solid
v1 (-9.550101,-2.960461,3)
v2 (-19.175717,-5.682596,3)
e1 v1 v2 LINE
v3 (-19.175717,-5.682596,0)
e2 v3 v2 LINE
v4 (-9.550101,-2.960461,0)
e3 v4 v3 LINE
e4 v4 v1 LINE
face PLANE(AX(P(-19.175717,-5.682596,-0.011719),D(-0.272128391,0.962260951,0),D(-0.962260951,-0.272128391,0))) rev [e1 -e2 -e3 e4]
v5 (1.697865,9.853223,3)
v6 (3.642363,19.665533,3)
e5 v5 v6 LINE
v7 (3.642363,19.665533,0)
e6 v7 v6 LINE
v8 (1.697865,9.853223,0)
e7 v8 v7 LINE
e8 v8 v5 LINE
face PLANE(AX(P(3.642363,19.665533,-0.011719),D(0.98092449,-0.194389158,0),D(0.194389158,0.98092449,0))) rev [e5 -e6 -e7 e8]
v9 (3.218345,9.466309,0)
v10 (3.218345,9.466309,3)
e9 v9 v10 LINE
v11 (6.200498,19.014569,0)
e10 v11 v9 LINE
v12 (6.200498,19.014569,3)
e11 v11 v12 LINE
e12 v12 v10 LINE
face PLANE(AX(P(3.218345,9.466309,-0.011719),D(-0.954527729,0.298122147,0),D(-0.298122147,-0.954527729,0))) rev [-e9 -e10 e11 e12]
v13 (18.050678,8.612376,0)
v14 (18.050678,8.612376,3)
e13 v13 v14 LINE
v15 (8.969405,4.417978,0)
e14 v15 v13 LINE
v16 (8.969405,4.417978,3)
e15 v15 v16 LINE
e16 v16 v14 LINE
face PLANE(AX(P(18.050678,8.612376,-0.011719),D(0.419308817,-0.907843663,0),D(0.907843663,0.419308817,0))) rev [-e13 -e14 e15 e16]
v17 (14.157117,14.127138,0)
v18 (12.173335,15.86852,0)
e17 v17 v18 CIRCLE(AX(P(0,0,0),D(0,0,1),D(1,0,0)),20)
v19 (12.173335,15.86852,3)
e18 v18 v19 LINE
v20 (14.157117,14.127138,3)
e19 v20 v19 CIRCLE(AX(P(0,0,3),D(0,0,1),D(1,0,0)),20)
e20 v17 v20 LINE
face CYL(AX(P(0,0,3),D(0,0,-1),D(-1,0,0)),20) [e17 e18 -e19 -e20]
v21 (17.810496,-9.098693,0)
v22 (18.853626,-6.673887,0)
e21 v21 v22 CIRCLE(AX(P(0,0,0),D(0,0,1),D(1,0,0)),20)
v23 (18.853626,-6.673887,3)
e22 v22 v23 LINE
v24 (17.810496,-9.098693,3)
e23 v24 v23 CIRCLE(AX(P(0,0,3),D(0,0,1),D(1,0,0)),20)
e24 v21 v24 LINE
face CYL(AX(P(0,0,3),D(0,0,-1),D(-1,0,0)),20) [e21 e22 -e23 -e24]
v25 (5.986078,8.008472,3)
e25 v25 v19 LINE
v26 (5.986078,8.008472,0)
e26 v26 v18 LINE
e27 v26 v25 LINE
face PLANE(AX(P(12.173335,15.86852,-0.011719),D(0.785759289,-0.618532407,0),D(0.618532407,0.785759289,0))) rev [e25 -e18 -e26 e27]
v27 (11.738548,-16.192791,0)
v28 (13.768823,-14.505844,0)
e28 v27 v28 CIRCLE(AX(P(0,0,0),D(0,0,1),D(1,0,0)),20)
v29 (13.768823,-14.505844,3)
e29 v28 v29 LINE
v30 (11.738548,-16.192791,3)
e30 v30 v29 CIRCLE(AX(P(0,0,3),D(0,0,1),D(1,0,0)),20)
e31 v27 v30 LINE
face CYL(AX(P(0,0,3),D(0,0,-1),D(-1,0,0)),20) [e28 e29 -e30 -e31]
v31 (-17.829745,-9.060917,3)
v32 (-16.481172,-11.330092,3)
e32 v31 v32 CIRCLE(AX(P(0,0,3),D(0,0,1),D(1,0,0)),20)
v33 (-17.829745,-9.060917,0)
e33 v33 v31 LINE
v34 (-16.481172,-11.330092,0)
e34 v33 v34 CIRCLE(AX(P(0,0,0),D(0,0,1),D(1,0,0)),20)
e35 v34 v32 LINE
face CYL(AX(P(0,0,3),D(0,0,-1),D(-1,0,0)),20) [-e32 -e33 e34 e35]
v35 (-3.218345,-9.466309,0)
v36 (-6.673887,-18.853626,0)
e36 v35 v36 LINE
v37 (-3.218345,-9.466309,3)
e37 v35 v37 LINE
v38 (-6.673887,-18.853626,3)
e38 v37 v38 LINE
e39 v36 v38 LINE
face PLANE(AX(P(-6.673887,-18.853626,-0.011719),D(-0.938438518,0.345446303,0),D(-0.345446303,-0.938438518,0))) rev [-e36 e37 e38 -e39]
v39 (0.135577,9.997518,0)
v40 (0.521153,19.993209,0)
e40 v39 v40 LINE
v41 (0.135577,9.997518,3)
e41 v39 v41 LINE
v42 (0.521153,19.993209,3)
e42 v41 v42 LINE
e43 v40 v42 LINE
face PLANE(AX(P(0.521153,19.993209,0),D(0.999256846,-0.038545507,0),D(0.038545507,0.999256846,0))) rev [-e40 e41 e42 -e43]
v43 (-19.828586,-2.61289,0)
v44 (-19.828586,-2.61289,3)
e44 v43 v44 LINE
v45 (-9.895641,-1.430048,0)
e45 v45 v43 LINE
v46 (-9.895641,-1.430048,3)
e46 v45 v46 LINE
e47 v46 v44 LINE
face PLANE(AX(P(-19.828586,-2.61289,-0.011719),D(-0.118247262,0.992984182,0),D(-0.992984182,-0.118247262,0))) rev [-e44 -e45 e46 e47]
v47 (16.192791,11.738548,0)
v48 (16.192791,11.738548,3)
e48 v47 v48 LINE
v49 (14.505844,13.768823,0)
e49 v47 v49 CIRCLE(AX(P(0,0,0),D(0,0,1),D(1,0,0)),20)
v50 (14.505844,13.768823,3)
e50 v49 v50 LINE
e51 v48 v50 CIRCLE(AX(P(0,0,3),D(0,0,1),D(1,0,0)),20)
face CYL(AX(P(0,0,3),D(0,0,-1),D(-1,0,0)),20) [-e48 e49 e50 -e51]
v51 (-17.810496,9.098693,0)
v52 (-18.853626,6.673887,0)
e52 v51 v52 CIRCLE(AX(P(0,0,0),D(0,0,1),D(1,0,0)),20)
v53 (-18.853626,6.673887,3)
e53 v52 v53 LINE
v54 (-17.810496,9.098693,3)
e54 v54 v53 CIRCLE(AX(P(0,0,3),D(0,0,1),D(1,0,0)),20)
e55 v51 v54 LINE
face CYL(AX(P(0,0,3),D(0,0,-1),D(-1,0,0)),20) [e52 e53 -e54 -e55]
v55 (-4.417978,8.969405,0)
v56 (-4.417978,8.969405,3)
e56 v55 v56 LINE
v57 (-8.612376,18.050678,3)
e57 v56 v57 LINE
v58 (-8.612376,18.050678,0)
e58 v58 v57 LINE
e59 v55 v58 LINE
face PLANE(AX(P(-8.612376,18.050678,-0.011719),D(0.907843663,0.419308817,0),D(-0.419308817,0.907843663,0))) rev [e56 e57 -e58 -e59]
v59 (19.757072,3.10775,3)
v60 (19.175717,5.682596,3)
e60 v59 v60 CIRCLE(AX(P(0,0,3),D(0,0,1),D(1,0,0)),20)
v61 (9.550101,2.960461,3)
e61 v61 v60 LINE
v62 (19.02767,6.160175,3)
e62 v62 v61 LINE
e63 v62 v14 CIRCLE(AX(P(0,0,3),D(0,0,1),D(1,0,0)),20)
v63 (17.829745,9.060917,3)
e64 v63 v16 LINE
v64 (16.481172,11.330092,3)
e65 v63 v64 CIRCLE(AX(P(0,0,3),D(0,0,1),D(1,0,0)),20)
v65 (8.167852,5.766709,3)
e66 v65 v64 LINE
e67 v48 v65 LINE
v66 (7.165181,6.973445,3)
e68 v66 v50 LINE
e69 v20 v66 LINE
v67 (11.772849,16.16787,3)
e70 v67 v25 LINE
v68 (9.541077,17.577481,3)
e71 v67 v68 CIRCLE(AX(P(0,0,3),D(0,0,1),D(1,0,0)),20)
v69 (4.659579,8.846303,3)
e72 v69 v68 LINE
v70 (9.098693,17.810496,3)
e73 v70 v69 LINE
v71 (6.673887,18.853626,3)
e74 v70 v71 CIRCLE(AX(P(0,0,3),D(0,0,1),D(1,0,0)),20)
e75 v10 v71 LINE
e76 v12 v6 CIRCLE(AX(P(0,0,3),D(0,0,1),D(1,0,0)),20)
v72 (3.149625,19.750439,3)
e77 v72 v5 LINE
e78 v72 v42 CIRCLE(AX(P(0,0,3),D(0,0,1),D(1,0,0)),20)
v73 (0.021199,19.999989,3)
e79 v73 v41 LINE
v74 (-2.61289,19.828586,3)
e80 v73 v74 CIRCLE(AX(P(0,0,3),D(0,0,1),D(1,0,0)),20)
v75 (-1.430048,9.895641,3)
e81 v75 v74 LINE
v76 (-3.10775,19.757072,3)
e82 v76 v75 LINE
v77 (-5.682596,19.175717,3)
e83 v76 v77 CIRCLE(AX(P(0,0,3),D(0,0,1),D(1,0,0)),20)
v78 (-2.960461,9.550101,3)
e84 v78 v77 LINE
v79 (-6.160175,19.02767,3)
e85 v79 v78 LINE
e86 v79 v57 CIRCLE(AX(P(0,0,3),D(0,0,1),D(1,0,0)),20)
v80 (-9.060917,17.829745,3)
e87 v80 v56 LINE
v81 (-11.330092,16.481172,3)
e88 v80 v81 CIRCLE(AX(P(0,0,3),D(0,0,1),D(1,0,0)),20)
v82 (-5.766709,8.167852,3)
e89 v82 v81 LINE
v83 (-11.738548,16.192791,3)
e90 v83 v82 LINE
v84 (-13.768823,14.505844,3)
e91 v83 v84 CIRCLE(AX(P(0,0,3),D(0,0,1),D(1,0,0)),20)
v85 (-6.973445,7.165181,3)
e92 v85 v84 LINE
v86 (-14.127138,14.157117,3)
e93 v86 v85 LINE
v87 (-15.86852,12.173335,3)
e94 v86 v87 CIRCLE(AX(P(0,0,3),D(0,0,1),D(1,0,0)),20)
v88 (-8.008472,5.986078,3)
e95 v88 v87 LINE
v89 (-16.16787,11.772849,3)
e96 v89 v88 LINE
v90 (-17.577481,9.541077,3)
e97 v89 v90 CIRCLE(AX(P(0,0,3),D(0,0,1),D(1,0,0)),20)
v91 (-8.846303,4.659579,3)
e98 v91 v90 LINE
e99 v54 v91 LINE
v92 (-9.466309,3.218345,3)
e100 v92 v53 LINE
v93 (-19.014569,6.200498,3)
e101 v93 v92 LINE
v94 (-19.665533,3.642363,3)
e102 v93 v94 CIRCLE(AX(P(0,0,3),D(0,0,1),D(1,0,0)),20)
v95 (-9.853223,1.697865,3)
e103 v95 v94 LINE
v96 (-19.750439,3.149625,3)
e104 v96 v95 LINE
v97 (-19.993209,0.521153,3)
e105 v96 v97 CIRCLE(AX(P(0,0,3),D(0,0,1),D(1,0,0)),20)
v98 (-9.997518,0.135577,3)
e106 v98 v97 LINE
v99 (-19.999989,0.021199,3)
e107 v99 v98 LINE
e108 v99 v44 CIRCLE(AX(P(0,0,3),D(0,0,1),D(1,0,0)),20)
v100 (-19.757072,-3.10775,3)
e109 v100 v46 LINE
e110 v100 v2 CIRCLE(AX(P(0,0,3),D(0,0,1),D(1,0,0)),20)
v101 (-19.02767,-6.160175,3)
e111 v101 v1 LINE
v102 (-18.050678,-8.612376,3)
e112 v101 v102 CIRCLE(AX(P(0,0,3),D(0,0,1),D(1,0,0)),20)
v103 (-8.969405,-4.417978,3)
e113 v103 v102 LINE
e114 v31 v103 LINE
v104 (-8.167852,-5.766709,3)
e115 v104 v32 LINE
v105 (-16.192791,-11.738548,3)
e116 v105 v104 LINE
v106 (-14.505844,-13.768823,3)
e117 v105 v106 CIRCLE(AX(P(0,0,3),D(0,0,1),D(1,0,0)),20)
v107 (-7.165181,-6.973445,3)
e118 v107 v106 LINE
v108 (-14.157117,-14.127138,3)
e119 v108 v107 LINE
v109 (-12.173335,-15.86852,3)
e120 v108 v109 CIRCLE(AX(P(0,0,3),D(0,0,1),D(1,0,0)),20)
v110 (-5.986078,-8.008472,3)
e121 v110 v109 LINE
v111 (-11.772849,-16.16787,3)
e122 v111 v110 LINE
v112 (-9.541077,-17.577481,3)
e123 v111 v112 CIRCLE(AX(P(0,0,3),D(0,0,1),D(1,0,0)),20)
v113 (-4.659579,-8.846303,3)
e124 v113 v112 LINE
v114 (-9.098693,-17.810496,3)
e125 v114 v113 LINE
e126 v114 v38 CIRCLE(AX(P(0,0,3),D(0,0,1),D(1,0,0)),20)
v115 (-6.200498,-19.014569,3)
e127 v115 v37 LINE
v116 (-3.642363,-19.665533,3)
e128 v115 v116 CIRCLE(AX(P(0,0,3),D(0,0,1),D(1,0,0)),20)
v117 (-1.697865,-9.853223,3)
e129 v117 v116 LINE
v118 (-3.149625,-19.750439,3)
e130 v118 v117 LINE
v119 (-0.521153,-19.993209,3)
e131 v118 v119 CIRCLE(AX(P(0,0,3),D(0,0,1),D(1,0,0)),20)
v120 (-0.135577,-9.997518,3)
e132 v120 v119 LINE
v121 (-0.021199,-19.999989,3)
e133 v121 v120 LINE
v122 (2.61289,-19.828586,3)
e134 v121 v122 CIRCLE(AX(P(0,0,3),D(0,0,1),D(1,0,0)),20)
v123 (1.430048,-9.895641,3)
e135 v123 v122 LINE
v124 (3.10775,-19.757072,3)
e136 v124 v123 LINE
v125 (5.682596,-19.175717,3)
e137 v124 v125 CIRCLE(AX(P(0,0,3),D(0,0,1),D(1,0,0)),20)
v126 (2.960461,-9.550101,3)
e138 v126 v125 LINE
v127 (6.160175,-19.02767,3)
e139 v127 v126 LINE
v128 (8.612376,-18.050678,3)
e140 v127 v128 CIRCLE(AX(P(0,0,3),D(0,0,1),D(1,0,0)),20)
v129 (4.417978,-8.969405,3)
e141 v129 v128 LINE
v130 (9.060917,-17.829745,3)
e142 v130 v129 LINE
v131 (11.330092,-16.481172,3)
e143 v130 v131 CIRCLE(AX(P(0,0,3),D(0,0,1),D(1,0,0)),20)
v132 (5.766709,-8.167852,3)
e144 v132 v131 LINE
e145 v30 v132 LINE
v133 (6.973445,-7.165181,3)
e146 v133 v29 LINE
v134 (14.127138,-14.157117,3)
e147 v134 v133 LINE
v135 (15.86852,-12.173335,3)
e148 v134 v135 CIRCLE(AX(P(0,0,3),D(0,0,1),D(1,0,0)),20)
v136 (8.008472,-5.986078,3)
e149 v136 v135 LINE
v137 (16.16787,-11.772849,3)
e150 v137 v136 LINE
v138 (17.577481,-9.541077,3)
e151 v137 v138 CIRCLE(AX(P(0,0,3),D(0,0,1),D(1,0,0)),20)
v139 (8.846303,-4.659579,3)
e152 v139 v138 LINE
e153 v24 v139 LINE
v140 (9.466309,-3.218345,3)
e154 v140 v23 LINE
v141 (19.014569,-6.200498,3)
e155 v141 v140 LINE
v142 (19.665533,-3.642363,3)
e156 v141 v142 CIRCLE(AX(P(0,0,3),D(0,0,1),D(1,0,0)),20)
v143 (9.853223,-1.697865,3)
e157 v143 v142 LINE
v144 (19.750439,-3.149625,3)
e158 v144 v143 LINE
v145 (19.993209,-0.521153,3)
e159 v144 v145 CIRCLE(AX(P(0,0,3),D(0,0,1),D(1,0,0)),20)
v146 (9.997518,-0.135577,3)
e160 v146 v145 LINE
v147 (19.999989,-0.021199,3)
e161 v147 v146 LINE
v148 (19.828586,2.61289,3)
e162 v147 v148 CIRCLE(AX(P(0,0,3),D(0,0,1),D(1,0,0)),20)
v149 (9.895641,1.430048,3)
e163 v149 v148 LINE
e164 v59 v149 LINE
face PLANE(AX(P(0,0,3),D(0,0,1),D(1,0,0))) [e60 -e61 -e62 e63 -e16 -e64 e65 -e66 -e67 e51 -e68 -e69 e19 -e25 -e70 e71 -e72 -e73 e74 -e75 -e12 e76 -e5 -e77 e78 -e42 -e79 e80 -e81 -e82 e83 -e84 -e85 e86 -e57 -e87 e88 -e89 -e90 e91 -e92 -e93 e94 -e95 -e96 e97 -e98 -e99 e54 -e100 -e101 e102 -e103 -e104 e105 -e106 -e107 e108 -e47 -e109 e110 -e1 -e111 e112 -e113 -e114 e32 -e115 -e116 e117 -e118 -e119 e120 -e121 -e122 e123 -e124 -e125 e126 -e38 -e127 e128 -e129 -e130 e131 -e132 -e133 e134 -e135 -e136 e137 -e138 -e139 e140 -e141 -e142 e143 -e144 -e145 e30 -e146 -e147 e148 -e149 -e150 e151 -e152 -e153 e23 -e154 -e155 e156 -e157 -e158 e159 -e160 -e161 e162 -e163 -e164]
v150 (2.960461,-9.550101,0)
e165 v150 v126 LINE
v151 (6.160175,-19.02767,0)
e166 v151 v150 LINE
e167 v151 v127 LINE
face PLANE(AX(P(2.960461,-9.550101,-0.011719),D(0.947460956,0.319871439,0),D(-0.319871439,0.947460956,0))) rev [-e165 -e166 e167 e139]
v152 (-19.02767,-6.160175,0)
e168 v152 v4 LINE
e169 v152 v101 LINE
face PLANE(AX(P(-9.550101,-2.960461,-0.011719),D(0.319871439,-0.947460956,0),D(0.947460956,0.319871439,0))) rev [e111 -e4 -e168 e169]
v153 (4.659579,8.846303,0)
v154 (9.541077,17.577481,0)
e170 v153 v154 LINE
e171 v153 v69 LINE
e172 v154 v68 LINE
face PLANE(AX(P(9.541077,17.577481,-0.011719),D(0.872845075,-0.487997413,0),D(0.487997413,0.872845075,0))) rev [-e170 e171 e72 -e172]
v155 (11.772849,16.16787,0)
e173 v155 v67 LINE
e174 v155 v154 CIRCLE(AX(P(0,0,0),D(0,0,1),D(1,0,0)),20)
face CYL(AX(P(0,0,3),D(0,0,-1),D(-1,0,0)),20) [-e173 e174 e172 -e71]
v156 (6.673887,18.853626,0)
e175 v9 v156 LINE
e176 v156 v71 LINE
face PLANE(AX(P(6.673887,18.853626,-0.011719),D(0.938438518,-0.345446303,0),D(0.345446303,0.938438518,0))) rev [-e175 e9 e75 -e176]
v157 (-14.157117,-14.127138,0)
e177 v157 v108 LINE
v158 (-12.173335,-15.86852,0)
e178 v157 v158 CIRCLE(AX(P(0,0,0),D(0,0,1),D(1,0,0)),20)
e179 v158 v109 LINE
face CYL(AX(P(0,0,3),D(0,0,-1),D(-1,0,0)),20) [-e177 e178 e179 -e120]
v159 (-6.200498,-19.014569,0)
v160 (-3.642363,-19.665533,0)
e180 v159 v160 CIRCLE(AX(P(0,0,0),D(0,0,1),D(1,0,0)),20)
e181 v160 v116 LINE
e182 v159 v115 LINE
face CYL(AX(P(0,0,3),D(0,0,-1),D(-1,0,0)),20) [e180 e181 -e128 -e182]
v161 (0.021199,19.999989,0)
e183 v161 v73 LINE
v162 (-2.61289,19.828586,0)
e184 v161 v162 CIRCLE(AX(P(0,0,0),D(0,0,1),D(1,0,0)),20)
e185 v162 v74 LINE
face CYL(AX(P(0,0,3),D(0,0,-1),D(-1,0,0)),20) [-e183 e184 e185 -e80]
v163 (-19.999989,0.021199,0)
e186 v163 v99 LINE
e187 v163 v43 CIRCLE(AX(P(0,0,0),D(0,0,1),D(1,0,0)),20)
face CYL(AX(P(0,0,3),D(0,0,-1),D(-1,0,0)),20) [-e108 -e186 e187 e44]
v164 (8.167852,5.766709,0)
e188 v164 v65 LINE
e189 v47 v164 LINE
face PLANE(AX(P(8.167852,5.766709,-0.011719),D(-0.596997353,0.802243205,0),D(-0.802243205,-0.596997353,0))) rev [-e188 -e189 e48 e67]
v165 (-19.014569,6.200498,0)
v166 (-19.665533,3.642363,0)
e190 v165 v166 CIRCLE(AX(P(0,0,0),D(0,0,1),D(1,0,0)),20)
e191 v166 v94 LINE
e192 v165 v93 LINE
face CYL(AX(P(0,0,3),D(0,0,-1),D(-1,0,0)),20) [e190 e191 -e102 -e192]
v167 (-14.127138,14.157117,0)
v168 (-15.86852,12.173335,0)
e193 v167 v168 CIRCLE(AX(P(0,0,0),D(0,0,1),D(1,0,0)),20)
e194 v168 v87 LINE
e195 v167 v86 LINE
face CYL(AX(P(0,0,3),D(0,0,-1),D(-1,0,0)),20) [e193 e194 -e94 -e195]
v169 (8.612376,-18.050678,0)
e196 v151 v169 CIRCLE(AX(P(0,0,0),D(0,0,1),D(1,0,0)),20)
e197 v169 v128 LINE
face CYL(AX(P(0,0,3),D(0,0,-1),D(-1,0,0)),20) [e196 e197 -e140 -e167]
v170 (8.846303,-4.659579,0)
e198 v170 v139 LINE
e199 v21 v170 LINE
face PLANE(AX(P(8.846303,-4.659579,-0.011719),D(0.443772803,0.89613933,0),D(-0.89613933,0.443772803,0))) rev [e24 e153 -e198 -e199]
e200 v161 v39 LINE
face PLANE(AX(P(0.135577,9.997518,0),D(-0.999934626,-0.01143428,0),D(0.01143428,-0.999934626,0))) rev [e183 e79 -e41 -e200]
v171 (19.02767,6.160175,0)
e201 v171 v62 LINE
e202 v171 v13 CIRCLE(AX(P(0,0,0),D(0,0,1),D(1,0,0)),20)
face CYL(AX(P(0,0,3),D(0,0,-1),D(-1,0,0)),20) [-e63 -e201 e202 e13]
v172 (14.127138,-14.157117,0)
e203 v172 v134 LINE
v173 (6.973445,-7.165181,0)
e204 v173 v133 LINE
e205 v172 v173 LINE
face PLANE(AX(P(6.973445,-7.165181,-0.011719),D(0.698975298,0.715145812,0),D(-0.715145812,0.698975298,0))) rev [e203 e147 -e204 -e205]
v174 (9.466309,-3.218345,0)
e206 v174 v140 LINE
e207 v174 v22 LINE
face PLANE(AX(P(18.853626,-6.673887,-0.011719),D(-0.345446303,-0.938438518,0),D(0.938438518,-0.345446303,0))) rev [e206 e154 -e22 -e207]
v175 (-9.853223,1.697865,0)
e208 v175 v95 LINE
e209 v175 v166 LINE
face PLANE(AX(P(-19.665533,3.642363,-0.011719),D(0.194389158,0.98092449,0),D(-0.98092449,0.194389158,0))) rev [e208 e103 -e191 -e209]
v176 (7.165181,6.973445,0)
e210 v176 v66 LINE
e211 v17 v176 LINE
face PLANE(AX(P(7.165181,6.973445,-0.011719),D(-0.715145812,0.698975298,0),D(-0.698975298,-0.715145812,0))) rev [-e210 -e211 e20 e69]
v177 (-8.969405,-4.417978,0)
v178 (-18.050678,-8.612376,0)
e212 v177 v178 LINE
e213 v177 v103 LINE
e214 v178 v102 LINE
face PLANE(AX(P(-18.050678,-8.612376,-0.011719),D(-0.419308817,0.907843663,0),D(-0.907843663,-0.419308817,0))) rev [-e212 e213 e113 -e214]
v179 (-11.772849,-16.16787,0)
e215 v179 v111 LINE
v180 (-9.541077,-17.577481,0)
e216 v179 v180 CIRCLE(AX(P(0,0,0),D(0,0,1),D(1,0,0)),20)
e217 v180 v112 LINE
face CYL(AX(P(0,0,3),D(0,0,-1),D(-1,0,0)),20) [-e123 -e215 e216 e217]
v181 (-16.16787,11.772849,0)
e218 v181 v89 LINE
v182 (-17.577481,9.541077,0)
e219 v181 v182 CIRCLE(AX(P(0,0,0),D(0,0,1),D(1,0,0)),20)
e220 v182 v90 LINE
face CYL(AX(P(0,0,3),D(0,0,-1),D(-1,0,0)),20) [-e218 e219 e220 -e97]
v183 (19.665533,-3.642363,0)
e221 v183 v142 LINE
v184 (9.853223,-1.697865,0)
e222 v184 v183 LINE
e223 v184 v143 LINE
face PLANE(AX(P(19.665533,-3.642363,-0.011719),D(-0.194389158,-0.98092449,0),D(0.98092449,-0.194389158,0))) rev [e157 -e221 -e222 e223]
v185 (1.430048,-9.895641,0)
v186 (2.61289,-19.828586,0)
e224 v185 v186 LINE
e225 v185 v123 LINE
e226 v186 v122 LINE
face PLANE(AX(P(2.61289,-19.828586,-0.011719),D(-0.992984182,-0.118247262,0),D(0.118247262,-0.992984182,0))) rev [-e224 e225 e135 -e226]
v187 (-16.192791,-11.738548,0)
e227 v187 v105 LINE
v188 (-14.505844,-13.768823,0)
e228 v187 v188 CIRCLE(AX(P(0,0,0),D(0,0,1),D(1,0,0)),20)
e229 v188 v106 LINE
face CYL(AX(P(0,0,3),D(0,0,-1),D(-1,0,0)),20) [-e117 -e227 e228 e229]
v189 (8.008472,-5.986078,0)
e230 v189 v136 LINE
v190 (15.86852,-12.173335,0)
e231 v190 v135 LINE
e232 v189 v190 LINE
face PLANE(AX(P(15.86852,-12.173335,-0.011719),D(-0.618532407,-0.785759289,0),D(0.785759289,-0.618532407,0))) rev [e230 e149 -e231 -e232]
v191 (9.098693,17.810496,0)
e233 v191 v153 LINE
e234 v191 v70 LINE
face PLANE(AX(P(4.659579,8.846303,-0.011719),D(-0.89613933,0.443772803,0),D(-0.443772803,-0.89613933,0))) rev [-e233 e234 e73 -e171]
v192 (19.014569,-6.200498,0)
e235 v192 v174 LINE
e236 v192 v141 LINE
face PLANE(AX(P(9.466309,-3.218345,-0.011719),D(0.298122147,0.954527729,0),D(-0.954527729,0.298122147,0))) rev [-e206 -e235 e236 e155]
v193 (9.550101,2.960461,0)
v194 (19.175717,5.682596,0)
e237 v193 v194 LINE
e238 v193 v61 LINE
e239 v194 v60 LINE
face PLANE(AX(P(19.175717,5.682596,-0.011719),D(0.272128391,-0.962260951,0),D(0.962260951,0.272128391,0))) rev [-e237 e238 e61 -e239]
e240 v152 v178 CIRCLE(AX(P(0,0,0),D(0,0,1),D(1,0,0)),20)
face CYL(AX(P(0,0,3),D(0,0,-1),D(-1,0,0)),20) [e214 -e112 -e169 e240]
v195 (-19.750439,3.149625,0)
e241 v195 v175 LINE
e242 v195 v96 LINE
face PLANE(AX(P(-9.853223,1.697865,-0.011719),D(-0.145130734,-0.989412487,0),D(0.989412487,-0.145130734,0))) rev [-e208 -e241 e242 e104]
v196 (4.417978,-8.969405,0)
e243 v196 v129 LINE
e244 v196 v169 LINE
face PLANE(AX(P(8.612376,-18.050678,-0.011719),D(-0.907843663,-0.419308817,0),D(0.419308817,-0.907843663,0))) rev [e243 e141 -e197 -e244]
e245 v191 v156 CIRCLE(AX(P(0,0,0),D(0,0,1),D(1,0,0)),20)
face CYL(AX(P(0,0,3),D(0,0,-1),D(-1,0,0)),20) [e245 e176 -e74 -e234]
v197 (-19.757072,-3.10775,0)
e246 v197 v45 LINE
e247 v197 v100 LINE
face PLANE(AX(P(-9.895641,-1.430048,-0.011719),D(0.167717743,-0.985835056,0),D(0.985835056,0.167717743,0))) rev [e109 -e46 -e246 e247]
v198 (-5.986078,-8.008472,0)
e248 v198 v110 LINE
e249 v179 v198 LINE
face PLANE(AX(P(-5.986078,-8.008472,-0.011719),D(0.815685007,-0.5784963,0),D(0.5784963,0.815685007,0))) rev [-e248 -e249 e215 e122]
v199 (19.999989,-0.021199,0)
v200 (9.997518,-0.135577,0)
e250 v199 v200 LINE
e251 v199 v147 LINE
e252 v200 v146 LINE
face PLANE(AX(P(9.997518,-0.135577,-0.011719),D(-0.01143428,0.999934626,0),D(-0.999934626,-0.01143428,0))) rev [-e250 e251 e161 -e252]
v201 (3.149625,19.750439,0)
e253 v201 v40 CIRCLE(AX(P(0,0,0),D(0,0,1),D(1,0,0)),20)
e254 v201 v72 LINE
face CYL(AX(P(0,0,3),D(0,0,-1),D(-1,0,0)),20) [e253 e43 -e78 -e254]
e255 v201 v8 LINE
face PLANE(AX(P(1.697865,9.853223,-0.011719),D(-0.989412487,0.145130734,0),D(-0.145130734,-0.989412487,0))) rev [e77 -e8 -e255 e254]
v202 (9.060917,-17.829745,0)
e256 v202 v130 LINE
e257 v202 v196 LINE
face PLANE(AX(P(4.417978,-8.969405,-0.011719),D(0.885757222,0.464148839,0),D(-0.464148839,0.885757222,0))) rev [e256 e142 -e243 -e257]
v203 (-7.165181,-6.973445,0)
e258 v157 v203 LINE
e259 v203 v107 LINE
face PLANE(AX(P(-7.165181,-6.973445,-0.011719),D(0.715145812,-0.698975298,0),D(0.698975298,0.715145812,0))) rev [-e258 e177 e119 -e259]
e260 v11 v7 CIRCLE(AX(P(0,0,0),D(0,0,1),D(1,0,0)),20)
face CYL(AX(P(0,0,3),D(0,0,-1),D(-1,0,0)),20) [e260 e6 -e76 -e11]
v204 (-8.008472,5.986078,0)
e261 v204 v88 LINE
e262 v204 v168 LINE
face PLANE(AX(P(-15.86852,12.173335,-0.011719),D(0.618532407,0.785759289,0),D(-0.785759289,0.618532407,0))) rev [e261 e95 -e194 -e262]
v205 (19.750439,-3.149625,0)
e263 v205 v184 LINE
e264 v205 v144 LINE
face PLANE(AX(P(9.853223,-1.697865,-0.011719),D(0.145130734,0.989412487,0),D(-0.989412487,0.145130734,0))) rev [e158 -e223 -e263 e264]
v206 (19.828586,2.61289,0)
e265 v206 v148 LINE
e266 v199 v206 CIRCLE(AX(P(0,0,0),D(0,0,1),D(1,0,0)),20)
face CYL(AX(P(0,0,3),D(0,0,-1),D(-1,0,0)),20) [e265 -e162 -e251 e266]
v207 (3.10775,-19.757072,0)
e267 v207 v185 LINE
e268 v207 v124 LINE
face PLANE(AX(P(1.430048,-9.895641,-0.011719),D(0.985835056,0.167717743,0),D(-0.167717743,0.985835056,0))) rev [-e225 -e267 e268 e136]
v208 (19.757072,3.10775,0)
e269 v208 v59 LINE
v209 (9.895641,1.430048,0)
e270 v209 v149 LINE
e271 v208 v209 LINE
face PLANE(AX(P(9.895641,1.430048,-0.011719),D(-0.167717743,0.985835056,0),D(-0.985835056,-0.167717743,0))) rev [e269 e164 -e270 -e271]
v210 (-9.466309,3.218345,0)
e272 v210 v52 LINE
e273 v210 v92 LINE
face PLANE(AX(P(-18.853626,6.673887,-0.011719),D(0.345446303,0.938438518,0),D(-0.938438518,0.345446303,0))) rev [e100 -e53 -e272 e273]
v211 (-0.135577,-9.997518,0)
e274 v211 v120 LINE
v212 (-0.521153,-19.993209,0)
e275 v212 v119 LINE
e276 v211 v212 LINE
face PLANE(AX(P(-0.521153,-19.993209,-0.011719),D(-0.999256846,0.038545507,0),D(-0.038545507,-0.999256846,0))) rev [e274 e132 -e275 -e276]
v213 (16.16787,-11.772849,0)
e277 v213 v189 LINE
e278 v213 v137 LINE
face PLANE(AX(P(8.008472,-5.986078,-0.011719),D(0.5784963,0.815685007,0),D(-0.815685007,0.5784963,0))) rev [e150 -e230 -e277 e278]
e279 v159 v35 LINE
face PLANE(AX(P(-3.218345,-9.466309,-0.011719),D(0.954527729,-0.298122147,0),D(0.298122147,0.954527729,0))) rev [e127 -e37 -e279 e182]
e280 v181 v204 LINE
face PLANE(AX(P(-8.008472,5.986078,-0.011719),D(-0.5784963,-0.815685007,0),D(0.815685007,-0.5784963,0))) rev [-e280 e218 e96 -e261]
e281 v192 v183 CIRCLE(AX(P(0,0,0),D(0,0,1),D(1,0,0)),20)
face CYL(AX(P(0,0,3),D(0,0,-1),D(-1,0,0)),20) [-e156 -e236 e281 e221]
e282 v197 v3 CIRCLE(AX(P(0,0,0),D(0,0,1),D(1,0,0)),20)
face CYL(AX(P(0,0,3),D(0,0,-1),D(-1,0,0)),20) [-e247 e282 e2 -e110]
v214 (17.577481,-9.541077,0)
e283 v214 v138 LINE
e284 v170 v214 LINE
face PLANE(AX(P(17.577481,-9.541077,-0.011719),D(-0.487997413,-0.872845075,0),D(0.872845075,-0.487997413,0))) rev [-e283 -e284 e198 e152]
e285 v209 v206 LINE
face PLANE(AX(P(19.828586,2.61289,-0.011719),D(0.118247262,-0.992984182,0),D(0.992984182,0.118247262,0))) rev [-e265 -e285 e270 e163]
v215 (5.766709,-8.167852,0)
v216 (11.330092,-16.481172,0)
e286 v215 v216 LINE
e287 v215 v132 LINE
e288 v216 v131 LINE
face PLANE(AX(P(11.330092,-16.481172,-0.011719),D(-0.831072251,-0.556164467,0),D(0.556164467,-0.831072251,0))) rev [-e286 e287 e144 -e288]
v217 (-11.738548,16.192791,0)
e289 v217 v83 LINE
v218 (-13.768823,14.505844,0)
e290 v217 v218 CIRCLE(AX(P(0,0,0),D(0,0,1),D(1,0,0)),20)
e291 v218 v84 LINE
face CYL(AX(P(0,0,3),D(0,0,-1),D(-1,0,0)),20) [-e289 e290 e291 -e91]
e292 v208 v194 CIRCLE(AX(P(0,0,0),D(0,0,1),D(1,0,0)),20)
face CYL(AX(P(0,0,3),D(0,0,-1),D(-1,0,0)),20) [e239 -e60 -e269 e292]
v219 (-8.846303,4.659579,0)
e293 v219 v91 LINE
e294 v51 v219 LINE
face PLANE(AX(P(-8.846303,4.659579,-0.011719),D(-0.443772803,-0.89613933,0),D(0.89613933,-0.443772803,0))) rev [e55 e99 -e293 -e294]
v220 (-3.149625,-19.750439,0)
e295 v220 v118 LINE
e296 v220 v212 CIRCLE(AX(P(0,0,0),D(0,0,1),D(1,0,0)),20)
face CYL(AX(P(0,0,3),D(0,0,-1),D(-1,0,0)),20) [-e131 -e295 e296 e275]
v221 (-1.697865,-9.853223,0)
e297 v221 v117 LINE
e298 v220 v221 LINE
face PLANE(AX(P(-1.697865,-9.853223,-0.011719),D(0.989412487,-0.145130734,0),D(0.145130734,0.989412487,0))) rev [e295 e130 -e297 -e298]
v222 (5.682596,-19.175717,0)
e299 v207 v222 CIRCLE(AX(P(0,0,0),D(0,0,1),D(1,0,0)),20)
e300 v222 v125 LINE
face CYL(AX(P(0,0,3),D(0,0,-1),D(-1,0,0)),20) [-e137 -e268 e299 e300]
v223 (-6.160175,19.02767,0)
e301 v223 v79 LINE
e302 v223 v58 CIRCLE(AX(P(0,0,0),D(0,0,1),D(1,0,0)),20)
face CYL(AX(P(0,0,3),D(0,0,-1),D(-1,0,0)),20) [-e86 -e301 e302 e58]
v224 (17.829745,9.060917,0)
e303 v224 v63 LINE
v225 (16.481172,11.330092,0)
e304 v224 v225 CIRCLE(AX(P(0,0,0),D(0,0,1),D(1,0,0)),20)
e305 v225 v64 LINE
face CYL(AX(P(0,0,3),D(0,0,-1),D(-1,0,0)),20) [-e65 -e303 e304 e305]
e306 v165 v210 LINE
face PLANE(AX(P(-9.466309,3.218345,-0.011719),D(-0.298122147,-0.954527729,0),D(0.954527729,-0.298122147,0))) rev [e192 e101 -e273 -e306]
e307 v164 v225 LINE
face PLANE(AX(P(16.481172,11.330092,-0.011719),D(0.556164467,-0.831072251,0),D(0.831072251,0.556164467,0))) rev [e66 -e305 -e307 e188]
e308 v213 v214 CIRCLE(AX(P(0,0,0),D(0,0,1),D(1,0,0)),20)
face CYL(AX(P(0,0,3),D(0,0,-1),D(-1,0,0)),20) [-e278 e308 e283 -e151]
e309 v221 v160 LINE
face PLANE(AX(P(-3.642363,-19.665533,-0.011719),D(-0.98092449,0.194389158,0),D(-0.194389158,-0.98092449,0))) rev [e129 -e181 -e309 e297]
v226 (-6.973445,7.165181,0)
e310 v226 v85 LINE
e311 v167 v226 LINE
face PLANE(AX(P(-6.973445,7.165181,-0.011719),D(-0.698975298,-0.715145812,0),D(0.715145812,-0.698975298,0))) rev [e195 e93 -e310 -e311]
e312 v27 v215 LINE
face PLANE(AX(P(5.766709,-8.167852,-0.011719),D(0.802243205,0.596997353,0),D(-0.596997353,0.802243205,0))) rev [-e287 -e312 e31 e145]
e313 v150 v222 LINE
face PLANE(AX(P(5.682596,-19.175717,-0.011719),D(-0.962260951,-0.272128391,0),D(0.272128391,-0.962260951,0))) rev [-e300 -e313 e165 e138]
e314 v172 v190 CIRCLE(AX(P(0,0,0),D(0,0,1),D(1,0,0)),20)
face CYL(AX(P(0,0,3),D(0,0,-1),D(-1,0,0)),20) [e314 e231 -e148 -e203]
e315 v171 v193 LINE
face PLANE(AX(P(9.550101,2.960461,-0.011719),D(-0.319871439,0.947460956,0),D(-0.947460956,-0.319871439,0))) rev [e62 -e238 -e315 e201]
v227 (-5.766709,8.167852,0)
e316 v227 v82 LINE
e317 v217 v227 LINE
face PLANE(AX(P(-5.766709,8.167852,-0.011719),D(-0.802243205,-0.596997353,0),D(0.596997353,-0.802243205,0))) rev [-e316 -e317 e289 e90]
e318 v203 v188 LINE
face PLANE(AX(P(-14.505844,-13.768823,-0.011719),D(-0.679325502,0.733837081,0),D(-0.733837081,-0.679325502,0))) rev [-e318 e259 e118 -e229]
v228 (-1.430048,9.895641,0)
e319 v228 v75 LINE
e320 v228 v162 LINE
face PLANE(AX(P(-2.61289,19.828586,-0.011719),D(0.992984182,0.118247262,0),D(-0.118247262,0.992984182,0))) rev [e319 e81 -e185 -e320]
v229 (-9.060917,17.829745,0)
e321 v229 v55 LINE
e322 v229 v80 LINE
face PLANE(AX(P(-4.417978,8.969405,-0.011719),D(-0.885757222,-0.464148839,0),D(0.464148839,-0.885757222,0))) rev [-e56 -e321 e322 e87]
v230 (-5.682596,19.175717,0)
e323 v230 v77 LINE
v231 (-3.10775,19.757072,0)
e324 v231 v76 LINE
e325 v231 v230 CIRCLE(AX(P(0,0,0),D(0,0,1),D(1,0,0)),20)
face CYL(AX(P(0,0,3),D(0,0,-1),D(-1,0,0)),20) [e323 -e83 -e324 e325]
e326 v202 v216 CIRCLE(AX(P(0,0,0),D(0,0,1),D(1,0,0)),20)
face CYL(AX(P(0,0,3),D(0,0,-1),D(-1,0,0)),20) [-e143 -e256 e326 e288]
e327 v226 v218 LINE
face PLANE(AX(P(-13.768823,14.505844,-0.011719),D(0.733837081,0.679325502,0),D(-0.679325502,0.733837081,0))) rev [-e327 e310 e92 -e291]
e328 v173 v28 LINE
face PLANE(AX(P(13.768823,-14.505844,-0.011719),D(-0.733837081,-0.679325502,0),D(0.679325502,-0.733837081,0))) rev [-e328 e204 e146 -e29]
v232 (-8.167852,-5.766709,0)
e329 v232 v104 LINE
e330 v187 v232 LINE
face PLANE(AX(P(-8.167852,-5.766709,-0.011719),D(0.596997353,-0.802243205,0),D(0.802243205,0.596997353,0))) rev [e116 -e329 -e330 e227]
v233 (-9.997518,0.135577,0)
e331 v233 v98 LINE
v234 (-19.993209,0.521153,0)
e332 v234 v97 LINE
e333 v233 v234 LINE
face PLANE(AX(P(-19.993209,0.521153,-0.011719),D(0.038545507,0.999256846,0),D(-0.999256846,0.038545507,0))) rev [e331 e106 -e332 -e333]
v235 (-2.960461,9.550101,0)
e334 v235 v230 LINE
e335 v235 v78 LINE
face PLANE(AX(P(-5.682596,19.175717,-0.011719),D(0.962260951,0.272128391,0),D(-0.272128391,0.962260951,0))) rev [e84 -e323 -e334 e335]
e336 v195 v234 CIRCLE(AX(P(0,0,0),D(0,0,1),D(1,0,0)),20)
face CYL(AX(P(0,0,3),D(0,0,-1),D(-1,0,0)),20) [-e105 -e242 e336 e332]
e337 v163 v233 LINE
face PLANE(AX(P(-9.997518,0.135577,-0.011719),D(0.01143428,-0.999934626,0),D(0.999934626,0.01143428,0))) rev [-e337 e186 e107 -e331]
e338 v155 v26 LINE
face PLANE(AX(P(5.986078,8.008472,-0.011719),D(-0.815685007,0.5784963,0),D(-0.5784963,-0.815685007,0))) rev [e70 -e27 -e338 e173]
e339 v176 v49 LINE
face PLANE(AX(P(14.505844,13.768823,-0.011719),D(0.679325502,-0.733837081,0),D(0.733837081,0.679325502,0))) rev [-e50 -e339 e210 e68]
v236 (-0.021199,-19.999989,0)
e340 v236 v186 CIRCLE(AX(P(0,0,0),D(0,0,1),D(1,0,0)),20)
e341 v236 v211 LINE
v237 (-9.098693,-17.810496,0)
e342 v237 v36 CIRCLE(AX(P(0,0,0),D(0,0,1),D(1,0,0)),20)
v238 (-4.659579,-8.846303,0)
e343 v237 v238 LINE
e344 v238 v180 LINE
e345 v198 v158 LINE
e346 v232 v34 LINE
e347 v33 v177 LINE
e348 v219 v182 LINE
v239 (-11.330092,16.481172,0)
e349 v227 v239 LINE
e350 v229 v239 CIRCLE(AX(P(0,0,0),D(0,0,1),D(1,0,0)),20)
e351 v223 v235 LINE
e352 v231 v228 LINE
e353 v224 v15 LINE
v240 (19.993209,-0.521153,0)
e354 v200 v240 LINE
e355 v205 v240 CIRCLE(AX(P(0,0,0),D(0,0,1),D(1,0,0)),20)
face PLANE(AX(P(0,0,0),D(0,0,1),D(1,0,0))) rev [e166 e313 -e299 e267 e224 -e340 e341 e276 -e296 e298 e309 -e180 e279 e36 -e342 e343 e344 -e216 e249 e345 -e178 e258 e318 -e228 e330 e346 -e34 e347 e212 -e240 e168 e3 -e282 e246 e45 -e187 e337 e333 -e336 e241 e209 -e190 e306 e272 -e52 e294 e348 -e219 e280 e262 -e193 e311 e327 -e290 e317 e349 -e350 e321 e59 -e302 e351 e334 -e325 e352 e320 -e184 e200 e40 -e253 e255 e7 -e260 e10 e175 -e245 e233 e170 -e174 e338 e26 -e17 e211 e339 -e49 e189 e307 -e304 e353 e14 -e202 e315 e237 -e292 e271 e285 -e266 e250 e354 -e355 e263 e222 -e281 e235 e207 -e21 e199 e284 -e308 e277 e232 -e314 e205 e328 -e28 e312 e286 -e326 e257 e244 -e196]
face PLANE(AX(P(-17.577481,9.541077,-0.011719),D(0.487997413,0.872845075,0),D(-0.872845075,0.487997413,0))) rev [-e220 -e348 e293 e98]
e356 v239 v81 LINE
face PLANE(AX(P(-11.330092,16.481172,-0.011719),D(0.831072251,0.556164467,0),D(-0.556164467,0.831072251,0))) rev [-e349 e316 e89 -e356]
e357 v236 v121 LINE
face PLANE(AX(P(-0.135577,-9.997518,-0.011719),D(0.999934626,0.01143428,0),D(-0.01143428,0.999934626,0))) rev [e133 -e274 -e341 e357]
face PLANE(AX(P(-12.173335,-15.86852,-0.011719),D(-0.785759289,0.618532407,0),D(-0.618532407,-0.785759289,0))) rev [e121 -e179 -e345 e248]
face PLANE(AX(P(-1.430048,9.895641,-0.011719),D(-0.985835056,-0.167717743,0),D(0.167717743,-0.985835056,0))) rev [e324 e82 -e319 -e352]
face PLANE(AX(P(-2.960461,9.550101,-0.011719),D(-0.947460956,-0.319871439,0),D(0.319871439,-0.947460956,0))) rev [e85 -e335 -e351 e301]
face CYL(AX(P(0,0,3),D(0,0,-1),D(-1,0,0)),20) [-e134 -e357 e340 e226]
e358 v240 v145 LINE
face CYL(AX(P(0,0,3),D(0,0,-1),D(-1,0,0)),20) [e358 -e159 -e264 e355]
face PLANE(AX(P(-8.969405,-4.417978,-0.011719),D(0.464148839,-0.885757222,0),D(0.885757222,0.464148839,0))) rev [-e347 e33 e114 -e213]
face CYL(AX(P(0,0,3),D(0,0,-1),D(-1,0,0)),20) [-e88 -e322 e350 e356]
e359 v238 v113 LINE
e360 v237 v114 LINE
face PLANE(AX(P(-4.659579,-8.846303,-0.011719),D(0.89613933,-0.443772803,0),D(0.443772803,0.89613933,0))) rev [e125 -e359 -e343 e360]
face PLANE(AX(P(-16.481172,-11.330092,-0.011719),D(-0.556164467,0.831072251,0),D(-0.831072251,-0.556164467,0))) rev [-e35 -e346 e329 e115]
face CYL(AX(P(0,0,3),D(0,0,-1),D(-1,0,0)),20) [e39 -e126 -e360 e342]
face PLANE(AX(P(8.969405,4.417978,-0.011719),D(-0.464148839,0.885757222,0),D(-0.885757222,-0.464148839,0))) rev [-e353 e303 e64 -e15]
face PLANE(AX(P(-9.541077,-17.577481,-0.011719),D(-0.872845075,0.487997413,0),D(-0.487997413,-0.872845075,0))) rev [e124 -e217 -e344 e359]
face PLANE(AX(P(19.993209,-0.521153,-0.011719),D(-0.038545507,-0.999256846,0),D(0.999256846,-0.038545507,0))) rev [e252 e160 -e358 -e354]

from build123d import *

# Parameters (mm, degrees)
SKETCH1_R           = 20
BOSS_EXTRUDE1_DEPTH = 3
CUT_EXTRUDE5_DEPTH  = 29.442925307
CIRPATTERN1_DEPTH   = 3


# Read off the part's stored shape, not the designer's step: CirPattern1
with BuildPart() as part:
    # Sketch1 → Boss-Extrude1 (new body)
    with BuildSketch(Plane.XY):
        Circle(SKETCH1_R)
    extrude(amount=BOSS_EXTRUDE1_DEPTH)

    # Sketch2 → Cut-Extrude5 (cut, through all)
    with BuildSketch(Plane.XY.offset(3)):
        Polygon((0.021198778, 19.999988765), (0.521152809, 19.993208841), (0.135577303, 9.997518193), align=None)
    extrude(amount=-CUT_EXTRUDE5_DEPTH, mode=Mode.SUBTRACT)


with BuildPart() as cut_extrude5_kept_piece:
    # of the separate pieces the step leaves, the one the design keeps (cut_extrude5_pieces_kept)
    add(part.part.solids().sort_by_distance((20, 0, 0))[0])

    # CirPattern1 outline → CirPattern1 (cut)
    with BuildSketch(Plane.XY):
        with BuildLine():
            Line((-3.107749756, 19.757071931), (-1.430048289, 9.895641117))
            Line((-1.430048289, 9.895641117), (-2.612890376, 19.828585521))
            ThreePointArc((-2.612890376, 19.828585521), (-2.860543555, 19.794375222), (-3.107749756, 19.757071931))
        make_face()
        with BuildLine():
            Line((1.697864531, 9.853223191), (3.642363483, 19.665533006))
            ThreePointArc((3.642363483, 19.665533006), (3.396259749, 19.709526119), (3.149625329, 19.750439499))
            Line((3.149625329, 19.750439499), (1.697864531, 9.853223191))
        make_face()
        with BuildLine():
            Line((3.2183447, 9.466309133), (6.673887081, 18.853626482))
            ThreePointArc((6.673887081, 18.853626482), (6.437695332, 18.935577073), (6.200497654, 19.014568864))
            Line((6.200497654, 19.014568864), (3.2183447, 9.466309133))
        make_face()
        with BuildLine():
            Line((4.659578542, 8.846303128), (9.541077431, 17.577481101))
            ThreePointArc((9.541077431, 17.577481101), (9.320613491, 17.695371275), (9.098693148, 17.810496438))
            Line((9.098693148, 17.810496438), (4.659578542, 8.846303128))
        make_face()
        with BuildLine():
            Line((5.986078095, 8.00847178), (12.17333479, 15.868519799))
            ThreePointArc((12.17333479, 15.868519799), (11.974027213, 16.019446707), (11.772848622, 16.167870479))
            Line((11.772848622, 16.167870479), (5.986078095, 8.00847178))
        make_face()
        with BuildLine():
            Line((7.165180539, 6.973445279), (14.505844245, 13.768822875))
            ThreePointArc((14.505844245, 13.768822875), (14.332600646, 13.949070196), (14.15711749, 14.127137891))
            Line((14.15711749, 14.127137891), (7.165180539, 6.973445279))
        make_face()
        with BuildLine():
            Line((8.167852459, 5.766709411), (16.481171674, 11.330091834))
            ThreePointArc((16.481171674, 11.330091834), (16.338257884, 11.535221282), (16.192791142, 11.73854828))
            Line((16.192791142, 11.73854828), (8.167852459, 5.766709411))
        make_face()
        with BuildLine():
            Line((8.969404743, 4.417978019), (18.050677958, 8.612376328))
            ThreePointArc((18.050677958, 8.612376328), (17.94161299, 8.837336935), (17.829744535, 9.060916653))
            Line((17.829744535, 9.060916653), (8.969404743, 4.417978019))
        make_face()
        with BuildLine():
            Line((9.550100515, 2.960461346), (19.175716644, 5.682595535))
            ThreePointArc((19.175716644, 5.682595535), (19.103186038, 5.921848023), (19.027670443, 6.160175186))
            Line((19.027670443, 6.160175186), (9.550100515, 2.960461346))
        make_face()
        with BuildLine():
            Line((9.895641117, 1.430048289), (19.828585545, 2.612890379))
            ThreePointArc((19.828585545, 2.612890379), (19.794375247, 2.860543558), (19.757071956, 3.10774976))
            Line((19.757071956, 3.10774976), (9.895641117, 1.430048289))
        make_face()
        with BuildLine():
            Line((9.997518193, -0.135577303), (19.993208862, -0.52115281))
            ThreePointArc((19.993208862, -0.52115281), (19.998161242, -0.271196982), (19.999988787, -0.021198778))
            Line((19.999988787, -0.021198778), (9.997518193, -0.135577303))
        make_face()
        with BuildLine():
            Line((9.853223191, -1.697864531), (19.665533023, -3.642363486))
            ThreePointArc((19.665533023, -3.642363486), (19.709526137, -3.396259752), (19.750439517, -3.149625332))
            Line((19.750439517, -3.149625332), (9.853223191, -1.697864531))
        make_face()
        with BuildLine():
            Line((9.466309133, -3.2183447), (18.853626494, -6.673887086))
            ThreePointArc((18.853626494, -6.673887086), (18.935577086, -6.437695337), (19.014568878, -6.200497658))
            Line((19.014568878, -6.200497658), (9.466309133, -3.2183447))
        make_face()
        with BuildLine():
            Line((8.846303128, -4.659578542), (17.577481109, -9.541077435))
            ThreePointArc((17.577481109, -9.541077435), (17.695371283, -9.320613495), (17.810496447, -9.098693153))
            Line((17.810496447, -9.098693153), (8.846303128, -4.659578542))
        make_face()
        with BuildLine():
            Line((8.00847178, -5.986078095), (15.868519802, -12.173334792))
            ThreePointArc((15.868519802, -12.173334792), (16.019446711, -11.974027216), (16.167870483, -11.772848624))
            Line((16.167870483, -11.772848624), (8.00847178, -5.986078095))
        make_face()
        with BuildLine():
            Line((6.973445279, -7.165180539), (13.768822874, -14.505844245))
            ThreePointArc((13.768822874, -14.505844245), (13.949070196, -14.332600646), (14.127137891, -14.15711749))
            Line((14.127137891, -14.15711749), (6.973445279, -7.165180539))
        make_face()
        with BuildLine():
            Line((5.766709411, -8.167852459), (11.330091831, -16.481171669))
            ThreePointArc((11.330091831, -16.481171669), (11.535221279, -16.33825788), (11.738548277, -16.192791138))
            Line((11.738548277, -16.192791138), (5.766709411, -8.167852459))
        make_face()
        with BuildLine():
            Line((4.417978019, -8.969404743), (8.612376324, -18.050677949))
            ThreePointArc((8.612376324, -18.050677949), (8.83733693, -17.941612981), (9.060916649, -17.829744526))
            Line((9.060916649, -17.829744526), (4.417978019, -8.969404743))
        make_face()
        with BuildLine():
            Line((2.960461346, -9.550100515), (5.682595531, -19.17571663))
            ThreePointArc((5.682595531, -19.17571663), (5.921848019, -19.103186025), (6.160175182, -19.02767043))
            Line((6.160175182, -19.02767043), (2.960461346, -9.550100515))
        make_face()
        with BuildLine():
            Line((1.430048289, -9.895641117), (2.612890376, -19.828585527))
            ThreePointArc((2.612890376, -19.828585527), (2.860543556, -19.794375229), (3.107749758, -19.757071938))
            Line((3.107749758, -19.757071938), (1.430048289, -9.895641117))
        make_face()
        with BuildLine():
            Line((-0.135577303, -9.997518193), (-0.521152809, -19.99320884))
            ThreePointArc((-0.521152809, -19.99320884), (-0.271196982, -19.99816122), (-0.021198778, -19.999988765))
            Line((-0.021198778, -19.999988765), (-0.135577303, -9.997518193))
        make_face()
        with BuildLine():
            Line((-1.697864531, -9.853223191), (-3.642363481, -19.665532998))
            ThreePointArc((-3.642363481, -19.665532998), (-3.396259748, -19.709526112), (-3.149625328, -19.750439493))
            Line((-3.149625328, -19.750439493), (-1.697864531, -9.853223191))
        make_face()
        with BuildLine():
            Line((-3.2183447, -9.466309133), (-6.673887077, -18.853626468))
            ThreePointArc((-6.673887077, -18.853626468), (-6.437695328, -18.93557706), (-6.20049765, -19.014568852))
            Line((-6.20049765, -19.014568852), (-3.2183447, -9.466309133))
        make_face()
        with BuildLine():
            Line((-4.659578542, -8.846303128), (-9.541077421, -17.577481083))
            ThreePointArc((-9.541077421, -17.577481083), (-9.320613482, -17.695371257), (-9.098693139, -17.810496421))
            Line((-9.098693139, -17.810496421), (-4.659578542, -8.846303128))
        make_face()
        with BuildLine():
            Line((-5.986078095, -8.00847178), (-12.173334774, -15.868519778))
            ThreePointArc((-12.173334774, -15.868519778), (-11.974027198, -16.019446687), (-11.772848606, -16.167870459))
            Line((-11.772848606, -16.167870459), (-5.986078095, -8.00847178))
        make_face()
        with BuildLine():
            Line((-7.165180539, -6.973445279), (-14.505844222, -13.768822853))
            ThreePointArc((-14.505844222, -13.768822853), (-14.332600623, -13.949070175), (-14.157117468, -14.127137869))
            Line((-14.157117468, -14.127137869), (-7.165180539, -6.973445279))
        make_face()
        with BuildLine():
            Line((-8.167852459, -5.766709411), (-16.481171644, -11.330091814))
            ThreePointArc((-16.481171644, -11.330091814), (-16.338257855, -11.535221261), (-16.192791114, -11.738548259))
            Line((-16.192791114, -11.738548259), (-8.167852459, -5.766709411))
        make_face()
        with BuildLine():
            Line((-8.969404743, -4.417978019), (-18.050677923, -8.612376311))
            ThreePointArc((-18.050677923, -8.612376311), (-17.941612955, -8.837336918), (-17.8297445, -9.060916636))
            Line((-17.8297445, -9.060916636), (-8.969404743, -4.417978019))
        make_face()
        with BuildLine():
            Line((-9.550100515, -2.960461346), (-19.175716604, -5.682595523))
            ThreePointArc((-19.175716604, -5.682595523), (-19.103185999, -5.921848011), (-19.027670404, -6.160175173))
            Line((-19.027670404, -6.160175173), (-9.550100515, -2.960461346))
        make_face()
        with BuildLine():
            Line((-9.895641117, -1.430048289), (-19.828585502, -2.612890373))
            ThreePointArc((-19.828585502, -2.612890373), (-19.794375204, -2.860543552), (-19.757071914, -3.107749754))
            Line((-19.757071914, -3.107749754), (-9.895641117, -1.430048289))
        make_face()
        with BuildLine():
            Line((-9.997518193, 0.135577303), (-19.993208819, 0.521152808))
            ThreePointArc((-19.993208819, 0.521152808), (-19.998161198, 0.271196981), (-19.999988743, 0.021198778))
            Line((-19.999988743, 0.021198778), (-9.997518193, 0.135577303))
        make_face()
        with BuildLine():
            Line((-9.853223191, 1.697864531), (-19.665532981, 3.642363478))
            ThreePointArc((-19.665532981, 3.642363478), (-19.709526095, 3.396259745), (-19.750439475, 3.149625326))
            Line((-19.750439475, 3.149625326), (-9.853223191, 1.697864531))
        make_face()
        with BuildLine():
            Line((-9.466309133, 3.2183447), (-18.853626455, 6.673887072))
            ThreePointArc((-18.853626455, 6.673887072), (-18.935577047, 6.437695323), (-19.014568838, 6.200497646))
            Line((-19.014568838, 6.200497646), (-9.466309133, 3.2183447))
        make_face()
        with BuildLine():
            Line((-8.846303128, 4.659578542), (-17.577481075, 9.541077417))
            ThreePointArc((-17.577481075, 9.541077417), (-17.695371249, 9.320613477), (-17.810496412, 9.098693135))
            Line((-17.810496412, 9.098693135), (-8.846303128, 4.659578542))
        make_face()
        with BuildLine():
            Line((-8.00847178, 5.986078095), (-15.868519775, 12.173334771))
            ThreePointArc((-15.868519775, 12.173334771), (-16.019446683, 11.974027195), (-16.167870455, 11.772848604))
            Line((-16.167870455, 11.772848604), (-8.00847178, 5.986078095))
        make_face()
        with BuildLine():
            Line((-6.973445279, 7.165180539), (-13.768822853, 14.505844223))
            ThreePointArc((-13.768822853, 14.505844223), (-13.949070175, 14.332600624), (-14.127137869, 14.157117468))
            Line((-14.127137869, 14.157117468), (-6.973445279, 7.165180539))
        make_face()
        with BuildLine():
            Line((-5.766709411, 8.167852459), (-11.330091817, 16.481171649))
            ThreePointArc((-11.330091817, 16.481171649), (-11.535221264, 16.338257859), (-11.738548262, 16.192791117))
            Line((-11.738548262, 16.192791117), (-5.766709411, 8.167852459))
        make_face()
        with BuildLine():
            Line((-4.417978019, 8.969404743), (-8.612376316, 18.050677932))
            ThreePointArc((-8.612376316, 18.050677932), (-8.837336922, 17.941612963), (-9.06091664, 17.829744508))
            Line((-9.06091664, 17.829744508), (-4.417978019, 8.969404743))
        make_face()
        with BuildLine():
            Line((-2.960461346, 9.550100515), (-5.682595527, 19.175716618))
            ThreePointArc((-5.682595527, 19.175716618), (-5.921848015, 19.103186012), (-6.160175178, 19.027670417))
            Line((-6.160175178, 19.027670417), (-2.960461346, 9.550100515))
        make_face()
    extrude(amount=CIRPATTERN1_DEPTH, mode=Mode.SUBTRACT)


solid = cut_extrude5_kept_piece.part
